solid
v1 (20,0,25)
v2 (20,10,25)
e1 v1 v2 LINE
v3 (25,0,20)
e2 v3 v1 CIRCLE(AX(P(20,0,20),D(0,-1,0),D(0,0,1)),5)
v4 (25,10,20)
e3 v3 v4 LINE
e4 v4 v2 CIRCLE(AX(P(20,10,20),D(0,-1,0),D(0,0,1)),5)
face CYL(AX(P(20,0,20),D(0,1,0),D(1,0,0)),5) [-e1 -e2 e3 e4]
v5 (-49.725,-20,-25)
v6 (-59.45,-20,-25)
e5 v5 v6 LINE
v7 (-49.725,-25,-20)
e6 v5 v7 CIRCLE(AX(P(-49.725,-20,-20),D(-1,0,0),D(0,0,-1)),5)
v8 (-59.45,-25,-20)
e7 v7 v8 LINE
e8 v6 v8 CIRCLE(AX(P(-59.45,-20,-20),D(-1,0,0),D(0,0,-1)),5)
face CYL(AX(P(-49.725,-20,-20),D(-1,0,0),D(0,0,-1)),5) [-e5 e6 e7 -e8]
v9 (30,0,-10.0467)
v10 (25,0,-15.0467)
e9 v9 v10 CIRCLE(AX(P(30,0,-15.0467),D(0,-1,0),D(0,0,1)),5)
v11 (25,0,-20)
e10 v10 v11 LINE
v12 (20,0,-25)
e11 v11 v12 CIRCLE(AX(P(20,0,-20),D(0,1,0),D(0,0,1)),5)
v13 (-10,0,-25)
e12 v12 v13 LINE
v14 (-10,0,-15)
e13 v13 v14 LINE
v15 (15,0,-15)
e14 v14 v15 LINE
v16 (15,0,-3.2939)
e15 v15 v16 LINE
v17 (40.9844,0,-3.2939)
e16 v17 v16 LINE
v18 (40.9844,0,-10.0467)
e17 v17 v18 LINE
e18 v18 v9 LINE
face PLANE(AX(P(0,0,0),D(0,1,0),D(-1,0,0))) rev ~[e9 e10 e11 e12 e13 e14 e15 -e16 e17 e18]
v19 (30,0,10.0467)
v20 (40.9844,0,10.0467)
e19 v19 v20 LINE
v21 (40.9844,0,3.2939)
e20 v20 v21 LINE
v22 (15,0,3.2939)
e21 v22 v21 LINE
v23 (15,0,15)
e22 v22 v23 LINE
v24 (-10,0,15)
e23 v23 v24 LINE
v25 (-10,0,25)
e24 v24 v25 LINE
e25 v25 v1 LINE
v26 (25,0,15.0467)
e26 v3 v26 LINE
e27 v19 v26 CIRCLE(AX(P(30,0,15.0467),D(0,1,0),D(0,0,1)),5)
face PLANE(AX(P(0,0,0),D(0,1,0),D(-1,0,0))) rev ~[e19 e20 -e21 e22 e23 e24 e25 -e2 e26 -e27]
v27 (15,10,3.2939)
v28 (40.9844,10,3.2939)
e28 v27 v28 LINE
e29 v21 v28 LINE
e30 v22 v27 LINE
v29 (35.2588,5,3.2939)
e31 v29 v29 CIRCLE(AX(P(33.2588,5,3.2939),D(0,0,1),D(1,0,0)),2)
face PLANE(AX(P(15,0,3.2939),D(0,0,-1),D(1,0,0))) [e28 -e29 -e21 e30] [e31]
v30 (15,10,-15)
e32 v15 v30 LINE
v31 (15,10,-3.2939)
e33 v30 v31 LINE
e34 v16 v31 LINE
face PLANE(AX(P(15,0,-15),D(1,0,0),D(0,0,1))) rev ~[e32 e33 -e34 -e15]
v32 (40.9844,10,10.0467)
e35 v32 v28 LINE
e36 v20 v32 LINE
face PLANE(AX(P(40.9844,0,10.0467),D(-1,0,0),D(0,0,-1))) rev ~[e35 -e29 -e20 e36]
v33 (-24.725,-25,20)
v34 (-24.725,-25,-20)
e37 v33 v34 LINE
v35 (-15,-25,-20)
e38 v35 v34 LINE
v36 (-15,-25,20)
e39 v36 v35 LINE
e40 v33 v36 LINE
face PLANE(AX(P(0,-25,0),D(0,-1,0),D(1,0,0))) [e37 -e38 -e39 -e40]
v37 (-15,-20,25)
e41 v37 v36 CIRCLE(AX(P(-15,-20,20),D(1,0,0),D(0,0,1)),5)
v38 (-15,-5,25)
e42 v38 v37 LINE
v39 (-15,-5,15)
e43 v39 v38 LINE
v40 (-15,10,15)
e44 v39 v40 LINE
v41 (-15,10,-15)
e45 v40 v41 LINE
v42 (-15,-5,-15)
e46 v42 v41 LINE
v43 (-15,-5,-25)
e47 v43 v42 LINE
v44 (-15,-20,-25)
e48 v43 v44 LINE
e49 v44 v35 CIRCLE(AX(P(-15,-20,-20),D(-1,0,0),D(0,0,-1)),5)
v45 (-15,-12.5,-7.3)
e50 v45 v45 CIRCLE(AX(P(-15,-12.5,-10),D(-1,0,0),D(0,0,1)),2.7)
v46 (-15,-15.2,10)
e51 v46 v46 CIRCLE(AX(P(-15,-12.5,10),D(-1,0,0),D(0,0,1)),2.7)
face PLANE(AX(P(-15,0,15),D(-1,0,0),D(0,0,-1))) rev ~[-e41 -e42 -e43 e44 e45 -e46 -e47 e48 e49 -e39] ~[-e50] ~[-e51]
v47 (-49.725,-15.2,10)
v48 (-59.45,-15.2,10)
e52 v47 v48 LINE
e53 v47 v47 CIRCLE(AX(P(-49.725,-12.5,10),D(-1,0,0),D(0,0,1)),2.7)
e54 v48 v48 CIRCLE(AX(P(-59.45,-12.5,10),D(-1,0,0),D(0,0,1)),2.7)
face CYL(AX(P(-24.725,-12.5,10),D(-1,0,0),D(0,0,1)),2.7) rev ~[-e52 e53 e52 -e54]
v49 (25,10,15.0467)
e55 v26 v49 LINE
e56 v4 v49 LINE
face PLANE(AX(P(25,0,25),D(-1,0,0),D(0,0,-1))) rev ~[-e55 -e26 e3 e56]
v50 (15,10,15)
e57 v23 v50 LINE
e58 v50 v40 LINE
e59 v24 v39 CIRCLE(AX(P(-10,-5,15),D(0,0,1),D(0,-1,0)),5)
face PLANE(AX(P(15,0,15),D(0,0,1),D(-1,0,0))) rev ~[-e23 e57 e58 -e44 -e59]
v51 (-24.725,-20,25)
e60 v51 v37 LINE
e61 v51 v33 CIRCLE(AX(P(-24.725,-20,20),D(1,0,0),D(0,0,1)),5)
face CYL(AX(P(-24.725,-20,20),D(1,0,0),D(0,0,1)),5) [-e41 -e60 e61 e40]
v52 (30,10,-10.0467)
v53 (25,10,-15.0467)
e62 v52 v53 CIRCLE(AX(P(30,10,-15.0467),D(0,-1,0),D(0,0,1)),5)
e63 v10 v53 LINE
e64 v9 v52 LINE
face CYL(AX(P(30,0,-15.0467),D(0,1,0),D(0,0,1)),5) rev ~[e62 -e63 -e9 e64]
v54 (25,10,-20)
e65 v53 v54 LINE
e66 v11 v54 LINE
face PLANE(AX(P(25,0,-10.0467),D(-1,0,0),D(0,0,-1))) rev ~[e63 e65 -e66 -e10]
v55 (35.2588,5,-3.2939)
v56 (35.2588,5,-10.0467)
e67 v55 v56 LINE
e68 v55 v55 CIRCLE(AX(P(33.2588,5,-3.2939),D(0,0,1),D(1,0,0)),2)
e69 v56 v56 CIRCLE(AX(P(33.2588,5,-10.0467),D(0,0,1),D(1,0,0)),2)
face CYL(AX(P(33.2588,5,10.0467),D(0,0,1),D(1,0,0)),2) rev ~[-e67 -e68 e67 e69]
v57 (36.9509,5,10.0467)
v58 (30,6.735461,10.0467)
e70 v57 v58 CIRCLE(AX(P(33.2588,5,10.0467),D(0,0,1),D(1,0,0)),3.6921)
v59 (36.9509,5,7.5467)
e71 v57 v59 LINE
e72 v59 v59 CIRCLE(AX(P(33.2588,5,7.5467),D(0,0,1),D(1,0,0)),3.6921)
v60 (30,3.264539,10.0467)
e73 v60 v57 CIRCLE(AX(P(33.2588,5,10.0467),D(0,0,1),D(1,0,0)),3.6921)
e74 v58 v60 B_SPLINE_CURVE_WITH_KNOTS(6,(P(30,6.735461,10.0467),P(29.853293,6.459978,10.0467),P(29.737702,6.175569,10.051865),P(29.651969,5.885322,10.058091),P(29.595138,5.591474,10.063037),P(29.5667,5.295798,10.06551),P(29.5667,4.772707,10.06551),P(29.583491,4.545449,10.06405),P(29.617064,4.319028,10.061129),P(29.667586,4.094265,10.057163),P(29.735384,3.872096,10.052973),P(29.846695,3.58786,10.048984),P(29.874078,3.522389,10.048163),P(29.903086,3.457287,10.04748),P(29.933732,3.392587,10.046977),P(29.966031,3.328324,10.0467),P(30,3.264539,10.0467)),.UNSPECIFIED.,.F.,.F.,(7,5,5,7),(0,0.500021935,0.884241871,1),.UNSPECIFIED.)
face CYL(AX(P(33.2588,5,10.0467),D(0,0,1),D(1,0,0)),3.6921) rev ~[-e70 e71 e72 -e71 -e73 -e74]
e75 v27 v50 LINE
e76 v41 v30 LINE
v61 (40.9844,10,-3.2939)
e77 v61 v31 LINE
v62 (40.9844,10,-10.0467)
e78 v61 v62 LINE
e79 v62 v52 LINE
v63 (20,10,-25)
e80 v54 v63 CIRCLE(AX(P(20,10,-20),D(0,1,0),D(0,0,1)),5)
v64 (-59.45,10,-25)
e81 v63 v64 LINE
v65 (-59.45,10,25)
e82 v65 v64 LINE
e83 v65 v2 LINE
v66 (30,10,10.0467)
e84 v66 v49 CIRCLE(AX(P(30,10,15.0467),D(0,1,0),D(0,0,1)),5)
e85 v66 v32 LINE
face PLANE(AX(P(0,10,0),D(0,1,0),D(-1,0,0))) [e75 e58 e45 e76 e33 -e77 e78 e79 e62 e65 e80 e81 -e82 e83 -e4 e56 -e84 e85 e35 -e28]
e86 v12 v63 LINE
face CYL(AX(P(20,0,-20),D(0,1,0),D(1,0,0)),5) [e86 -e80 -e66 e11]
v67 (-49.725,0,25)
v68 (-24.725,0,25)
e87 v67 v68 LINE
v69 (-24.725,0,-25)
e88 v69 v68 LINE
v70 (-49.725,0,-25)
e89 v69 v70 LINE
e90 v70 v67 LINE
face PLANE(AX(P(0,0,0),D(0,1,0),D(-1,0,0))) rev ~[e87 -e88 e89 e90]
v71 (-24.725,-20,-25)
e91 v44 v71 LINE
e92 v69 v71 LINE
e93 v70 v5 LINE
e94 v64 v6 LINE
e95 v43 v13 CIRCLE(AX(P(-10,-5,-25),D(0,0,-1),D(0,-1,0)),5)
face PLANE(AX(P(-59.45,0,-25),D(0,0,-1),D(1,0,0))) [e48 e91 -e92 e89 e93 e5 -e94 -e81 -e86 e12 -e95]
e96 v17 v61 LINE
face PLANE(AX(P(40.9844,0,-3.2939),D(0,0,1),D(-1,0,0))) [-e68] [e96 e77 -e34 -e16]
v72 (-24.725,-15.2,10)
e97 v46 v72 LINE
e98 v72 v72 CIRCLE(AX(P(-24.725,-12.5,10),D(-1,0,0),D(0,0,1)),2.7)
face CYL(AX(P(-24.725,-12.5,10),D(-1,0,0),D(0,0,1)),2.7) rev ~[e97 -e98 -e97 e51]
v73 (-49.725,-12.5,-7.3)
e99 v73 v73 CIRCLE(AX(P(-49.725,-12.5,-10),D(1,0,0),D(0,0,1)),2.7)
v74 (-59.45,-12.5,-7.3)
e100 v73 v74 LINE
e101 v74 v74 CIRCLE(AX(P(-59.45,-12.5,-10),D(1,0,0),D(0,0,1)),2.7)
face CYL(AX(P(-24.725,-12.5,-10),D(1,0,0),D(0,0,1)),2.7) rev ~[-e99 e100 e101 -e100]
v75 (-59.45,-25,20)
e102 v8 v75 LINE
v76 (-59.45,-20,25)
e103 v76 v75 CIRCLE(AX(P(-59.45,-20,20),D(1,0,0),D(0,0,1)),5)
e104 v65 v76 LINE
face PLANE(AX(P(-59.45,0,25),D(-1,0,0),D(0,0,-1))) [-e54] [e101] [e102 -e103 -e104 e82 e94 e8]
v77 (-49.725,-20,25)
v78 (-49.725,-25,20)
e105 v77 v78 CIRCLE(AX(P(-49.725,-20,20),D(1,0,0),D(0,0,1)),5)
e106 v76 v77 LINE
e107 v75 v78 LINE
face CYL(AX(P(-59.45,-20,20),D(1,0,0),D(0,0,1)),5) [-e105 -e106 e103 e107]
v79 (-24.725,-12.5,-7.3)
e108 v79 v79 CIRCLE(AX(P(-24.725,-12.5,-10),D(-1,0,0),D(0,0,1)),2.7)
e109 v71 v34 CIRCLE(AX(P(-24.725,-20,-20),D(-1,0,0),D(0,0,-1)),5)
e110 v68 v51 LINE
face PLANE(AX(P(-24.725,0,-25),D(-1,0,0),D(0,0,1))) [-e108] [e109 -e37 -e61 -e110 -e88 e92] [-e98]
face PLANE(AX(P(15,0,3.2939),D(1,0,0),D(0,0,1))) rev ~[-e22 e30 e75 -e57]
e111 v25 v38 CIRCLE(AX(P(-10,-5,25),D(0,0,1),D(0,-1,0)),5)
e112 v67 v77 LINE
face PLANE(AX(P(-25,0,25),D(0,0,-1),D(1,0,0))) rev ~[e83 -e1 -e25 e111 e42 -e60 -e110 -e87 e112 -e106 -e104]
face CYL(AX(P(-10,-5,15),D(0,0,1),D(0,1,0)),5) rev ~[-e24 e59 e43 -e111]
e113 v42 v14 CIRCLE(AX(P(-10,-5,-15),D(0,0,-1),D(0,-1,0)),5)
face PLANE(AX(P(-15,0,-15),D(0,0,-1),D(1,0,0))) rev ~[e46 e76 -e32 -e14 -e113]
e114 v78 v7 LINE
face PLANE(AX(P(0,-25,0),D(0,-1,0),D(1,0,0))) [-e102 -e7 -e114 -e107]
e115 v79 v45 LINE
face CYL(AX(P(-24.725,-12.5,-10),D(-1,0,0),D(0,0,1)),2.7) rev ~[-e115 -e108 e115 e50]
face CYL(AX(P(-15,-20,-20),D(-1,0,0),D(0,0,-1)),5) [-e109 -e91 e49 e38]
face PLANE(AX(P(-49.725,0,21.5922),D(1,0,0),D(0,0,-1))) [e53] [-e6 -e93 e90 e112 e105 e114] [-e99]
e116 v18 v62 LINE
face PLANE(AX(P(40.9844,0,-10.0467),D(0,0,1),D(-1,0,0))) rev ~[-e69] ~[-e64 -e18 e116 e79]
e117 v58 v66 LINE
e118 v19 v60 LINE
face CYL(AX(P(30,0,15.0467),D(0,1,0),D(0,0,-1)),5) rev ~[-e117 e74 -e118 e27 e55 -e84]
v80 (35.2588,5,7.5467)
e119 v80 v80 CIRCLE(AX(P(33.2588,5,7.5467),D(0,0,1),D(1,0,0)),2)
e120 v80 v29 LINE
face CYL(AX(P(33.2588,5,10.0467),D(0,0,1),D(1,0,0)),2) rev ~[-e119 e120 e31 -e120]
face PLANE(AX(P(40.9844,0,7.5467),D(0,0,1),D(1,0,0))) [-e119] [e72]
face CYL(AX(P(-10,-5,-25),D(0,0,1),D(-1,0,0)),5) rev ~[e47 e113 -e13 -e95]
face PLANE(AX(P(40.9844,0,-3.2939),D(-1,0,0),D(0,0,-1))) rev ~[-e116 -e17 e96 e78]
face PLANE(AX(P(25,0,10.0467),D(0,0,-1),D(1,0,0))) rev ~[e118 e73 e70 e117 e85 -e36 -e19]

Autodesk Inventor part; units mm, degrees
ref_plane "YZ Plane" through (0, 0, 0) normal (1, 0, 0) x (0, 1, 0)
ref_plane "XZ Plane" through (0, 0, 0) normal (0, 1, 0) x (-1, 0, 0)
ref_plane "XY Plane" through (0, 0, 0) normal (0, 0, 1) x (1, 0, 0)
sketch "Sketch1" plane through (0, 0, 0) normal (0, 1, 0) x (-1, 0, 0)
  line L0 (-15, 15) -> (15, 15)
  line L1 (15, 15) -> (15, -15)
  line L2 (15, -15) -> (-15, -15)
  line L3 (-15, 15) -> (15, -15) construction
  line L4 (15, 15) -> (-15, -15) construction
  line L5 (25, 25) -> (-25, 25)
  line L6 (-25, -25) -> (25, -25)
  line L7 (25, 25) -> (59.45, 25)
  line L8 (59.45, 25) -> (59.45, -25)
  line L9 (59.45, -25) -> (25, -25)
  line L10 (-40.9844, -10.0467) -> (-25, -10.0467)
  line L11 (-25, 10.0467) -> (-40.9844, 10.0467)
  line L12 (-40.9844, -10.0467) -> (-20.5822, 10.0467) construction
  line L13 (-27.4388, -3.2939) -> (-40.9844, 10.0467) construction
  line L14 (-40.9844, -3.2939) -> (-15, -3.2939)
  line L15 (-15, 3.2939) -> (-40.9844, 3.2939)
  line L16 (-46.5666, -3.2939) -> (-15, 3.2939) construction
  line L17 (-15, -3.2939) -> (-46.5666, 3.2939) construction
  line L18 (-40.9844, 10.0467) -> (-40.9844, 3.2939)
  line L19 (-40.9844, -3.2939) -> (-40.9844, -10.0467)
  line L20 (-25, 25) -> (-25, 10.0467)
  line L21 (-15, -15) -> (-15, -3.2939)
  line L22 (-15, 3.2939) -> (-15, 15)
  line L23 (-25, -10.0467) -> (-25, -25)
  point P0 (0, 0)
  point P1 (-30.7833, 0)
  dimension "d0" = 30
  dimension "d1" = 30
  dimension "d2" = 10
  dimension "d4" = 44.45
extrude "Extrusion1" add sketch "Sketch1" along normal blind 10
sketch "Sketch2" plane through (0, 0, 0) normal (0, -1, 0) x (1, 0, 0)
  line L0 (15, 15) -> (-15, 15) projected
  line L1 (15, 3.2939) -> (15, 15) projected
  line L2 (40.9844, 3.2939) -> (15, 3.2939) projected
  line L3 (40.9844, 10.0467) -> (40.9844, 3.2939) projected
  line L4 (25, 10.0467) -> (40.9844, 10.0467) projected
  line L5 (25, 25) -> (25, 10.0467) projected
  line L6 (-59.45, 25) -> (25, 25) projected
  line L7 (-59.45, -25) -> (-59.45, 25) projected
  line L8 (25, -25) -> (-59.45, -25) projected
  line L9 (25, -10.0467) -> (25, -25) projected
  line L10 (40.9844, -10.0467) -> (25, -10.0467) projected
  line L11 (40.9844, -3.2939) -> (40.9844, -10.0467) projected
  line L12 (15, -3.2939) -> (40.9844, -3.2939) projected
  line L13 (15, -15) -> (15, -3.2939) projected
  line L14 (-15, -15) -> (15, -15) projected
  line L15 (-15, 15) -> (-15, -15) projected
  line L16 (-49.725, -25) -> (-24.725, -25)
  line L17 (-24.725, -25) -> (-24.725, 25)
  line L18 (-24.725, 25) -> (-49.725, 25)
  line L19 (-49.725, 25) -> (-49.725, -25)
  line L20 (-49.725, -25) -> (-24.725, 25) construction
  line L21 (-24.725, -25) -> (-49.725, 25) construction
  line L22 (-59.45, 25) -> (25, 25) projected
  line L23 (-15, 25) -> (-15, -25)
  line L24 (25, -25) -> (-59.45, -25) projected
  line L25 (-59.45, 25) -> (-49.725, 25)
  line L26 (-59.45, 25) -> (25, 25) projected
  line L27 (-24.725, 25) -> (-15, 25)
  line L28 (-59.45, 21.5922) -> (-49.725, 21.5922)
  line L29 (-24.725, 21.5922) -> (-15, 21.5922)
  line L30 (-15, 15) -> (-15, -15) projected
  point P0 (0, 0)
  point P1 (-37.225, 0)
  point P2 (-15, -25)
  dimension "d7" = 25
extrude "Extrusion2" add sketch "Sketch2" along normal blind 25 contours L15 L23 L8 L17 L29 | L29 L17 L6 L23 | L8 L7 L28 L19 | L19 L28 L7 L6
sketch "Sketch3" plane through (-24.725, 0, -25) normal (-1, 0, 0) x (0, 0, 1)
  line L0 (0, 0) -> (50, 0) construction
  line L1 (0, 0) -> (0, -25) construction
  line L2 (50, -25) -> (0, -25) construction
  line L3 (50, 0) -> (50, -25) construction
  line L4 (0, -12.5) -> (50, -12.5) construction
  line L5 (50, 0) -> (50, -25) construction
  line L6 (15, -12.5) -> (35, -12.5) construction
  line L7 (15, -15.2) -> (35, -15.2) construction
  line L8 (35, -9.8) -> (15, -9.8) construction
  arc A0 (15, -9.8) -> (15, -15.2) centre (15, -12.5) ccw construction
  arc A1 (35, -15.2) -> (35, -9.8) centre (35, -12.5) ccw
  circle A2 centre (35, -12.5) radius 2.7
  circle A3 centre (15, -12.5) radius 2.7
  point P0 (25, 0)
  point P1 (25, -12.5)
  point P2 (35, -9.8)
  dimension "d10" = 20
  dimension "d11" = 2.7
extrude "Extrusion3" cut sketch "Sketch3" along normal through all both and the other way through all
fillet "Fillet1" radius 5 10 edges at (-15, 0, 20) (-15, 0, -20) (25, 5, -25) (25, 5, -10.0467) (25, 5, 10.0467) (25, 5, 25) (-19.8625, -25, 25) (-19.8625, -25, -25) (-54.5875, -25, -25) (-54.5875, -25, 25)
sketch "Sketch4" plane through (40.9844, 0, 10.0467) normal (0, 0, 1) x (1, 0, 0)
  line L0 (-10.9844, 0) -> (-10.9844, 10) projected
  line L1 (-10.9844, 0) -> (0, 0) projected
  line L2 (0, 0) -> (0, 10) projected
  line L3 (-10.9844, 10) -> (0, 10) projected
  circle A0 centre (-7.7256, 5) radius 2
  point P0 (-40.9844, 0)
  dimension "d15" = 4
extrude "Extrusion4" cut sketch "Sketch4" against normal through all contours A0
sketch "Sketch5" plane through (40.9844, 0, 10.0467) normal (0, 0, 1) x (1, 0, 0)
  circle A0 centre (-7.7256, 5) radius 2 projected
  circle A1 centre (-7.7256, 5) radius 3.6921
  point P0 (-40.9844, 0)
extrude "Extrusion5" cut sketch "Sketch5" along normal mid plane 5
properties part number "estopMountV1"
